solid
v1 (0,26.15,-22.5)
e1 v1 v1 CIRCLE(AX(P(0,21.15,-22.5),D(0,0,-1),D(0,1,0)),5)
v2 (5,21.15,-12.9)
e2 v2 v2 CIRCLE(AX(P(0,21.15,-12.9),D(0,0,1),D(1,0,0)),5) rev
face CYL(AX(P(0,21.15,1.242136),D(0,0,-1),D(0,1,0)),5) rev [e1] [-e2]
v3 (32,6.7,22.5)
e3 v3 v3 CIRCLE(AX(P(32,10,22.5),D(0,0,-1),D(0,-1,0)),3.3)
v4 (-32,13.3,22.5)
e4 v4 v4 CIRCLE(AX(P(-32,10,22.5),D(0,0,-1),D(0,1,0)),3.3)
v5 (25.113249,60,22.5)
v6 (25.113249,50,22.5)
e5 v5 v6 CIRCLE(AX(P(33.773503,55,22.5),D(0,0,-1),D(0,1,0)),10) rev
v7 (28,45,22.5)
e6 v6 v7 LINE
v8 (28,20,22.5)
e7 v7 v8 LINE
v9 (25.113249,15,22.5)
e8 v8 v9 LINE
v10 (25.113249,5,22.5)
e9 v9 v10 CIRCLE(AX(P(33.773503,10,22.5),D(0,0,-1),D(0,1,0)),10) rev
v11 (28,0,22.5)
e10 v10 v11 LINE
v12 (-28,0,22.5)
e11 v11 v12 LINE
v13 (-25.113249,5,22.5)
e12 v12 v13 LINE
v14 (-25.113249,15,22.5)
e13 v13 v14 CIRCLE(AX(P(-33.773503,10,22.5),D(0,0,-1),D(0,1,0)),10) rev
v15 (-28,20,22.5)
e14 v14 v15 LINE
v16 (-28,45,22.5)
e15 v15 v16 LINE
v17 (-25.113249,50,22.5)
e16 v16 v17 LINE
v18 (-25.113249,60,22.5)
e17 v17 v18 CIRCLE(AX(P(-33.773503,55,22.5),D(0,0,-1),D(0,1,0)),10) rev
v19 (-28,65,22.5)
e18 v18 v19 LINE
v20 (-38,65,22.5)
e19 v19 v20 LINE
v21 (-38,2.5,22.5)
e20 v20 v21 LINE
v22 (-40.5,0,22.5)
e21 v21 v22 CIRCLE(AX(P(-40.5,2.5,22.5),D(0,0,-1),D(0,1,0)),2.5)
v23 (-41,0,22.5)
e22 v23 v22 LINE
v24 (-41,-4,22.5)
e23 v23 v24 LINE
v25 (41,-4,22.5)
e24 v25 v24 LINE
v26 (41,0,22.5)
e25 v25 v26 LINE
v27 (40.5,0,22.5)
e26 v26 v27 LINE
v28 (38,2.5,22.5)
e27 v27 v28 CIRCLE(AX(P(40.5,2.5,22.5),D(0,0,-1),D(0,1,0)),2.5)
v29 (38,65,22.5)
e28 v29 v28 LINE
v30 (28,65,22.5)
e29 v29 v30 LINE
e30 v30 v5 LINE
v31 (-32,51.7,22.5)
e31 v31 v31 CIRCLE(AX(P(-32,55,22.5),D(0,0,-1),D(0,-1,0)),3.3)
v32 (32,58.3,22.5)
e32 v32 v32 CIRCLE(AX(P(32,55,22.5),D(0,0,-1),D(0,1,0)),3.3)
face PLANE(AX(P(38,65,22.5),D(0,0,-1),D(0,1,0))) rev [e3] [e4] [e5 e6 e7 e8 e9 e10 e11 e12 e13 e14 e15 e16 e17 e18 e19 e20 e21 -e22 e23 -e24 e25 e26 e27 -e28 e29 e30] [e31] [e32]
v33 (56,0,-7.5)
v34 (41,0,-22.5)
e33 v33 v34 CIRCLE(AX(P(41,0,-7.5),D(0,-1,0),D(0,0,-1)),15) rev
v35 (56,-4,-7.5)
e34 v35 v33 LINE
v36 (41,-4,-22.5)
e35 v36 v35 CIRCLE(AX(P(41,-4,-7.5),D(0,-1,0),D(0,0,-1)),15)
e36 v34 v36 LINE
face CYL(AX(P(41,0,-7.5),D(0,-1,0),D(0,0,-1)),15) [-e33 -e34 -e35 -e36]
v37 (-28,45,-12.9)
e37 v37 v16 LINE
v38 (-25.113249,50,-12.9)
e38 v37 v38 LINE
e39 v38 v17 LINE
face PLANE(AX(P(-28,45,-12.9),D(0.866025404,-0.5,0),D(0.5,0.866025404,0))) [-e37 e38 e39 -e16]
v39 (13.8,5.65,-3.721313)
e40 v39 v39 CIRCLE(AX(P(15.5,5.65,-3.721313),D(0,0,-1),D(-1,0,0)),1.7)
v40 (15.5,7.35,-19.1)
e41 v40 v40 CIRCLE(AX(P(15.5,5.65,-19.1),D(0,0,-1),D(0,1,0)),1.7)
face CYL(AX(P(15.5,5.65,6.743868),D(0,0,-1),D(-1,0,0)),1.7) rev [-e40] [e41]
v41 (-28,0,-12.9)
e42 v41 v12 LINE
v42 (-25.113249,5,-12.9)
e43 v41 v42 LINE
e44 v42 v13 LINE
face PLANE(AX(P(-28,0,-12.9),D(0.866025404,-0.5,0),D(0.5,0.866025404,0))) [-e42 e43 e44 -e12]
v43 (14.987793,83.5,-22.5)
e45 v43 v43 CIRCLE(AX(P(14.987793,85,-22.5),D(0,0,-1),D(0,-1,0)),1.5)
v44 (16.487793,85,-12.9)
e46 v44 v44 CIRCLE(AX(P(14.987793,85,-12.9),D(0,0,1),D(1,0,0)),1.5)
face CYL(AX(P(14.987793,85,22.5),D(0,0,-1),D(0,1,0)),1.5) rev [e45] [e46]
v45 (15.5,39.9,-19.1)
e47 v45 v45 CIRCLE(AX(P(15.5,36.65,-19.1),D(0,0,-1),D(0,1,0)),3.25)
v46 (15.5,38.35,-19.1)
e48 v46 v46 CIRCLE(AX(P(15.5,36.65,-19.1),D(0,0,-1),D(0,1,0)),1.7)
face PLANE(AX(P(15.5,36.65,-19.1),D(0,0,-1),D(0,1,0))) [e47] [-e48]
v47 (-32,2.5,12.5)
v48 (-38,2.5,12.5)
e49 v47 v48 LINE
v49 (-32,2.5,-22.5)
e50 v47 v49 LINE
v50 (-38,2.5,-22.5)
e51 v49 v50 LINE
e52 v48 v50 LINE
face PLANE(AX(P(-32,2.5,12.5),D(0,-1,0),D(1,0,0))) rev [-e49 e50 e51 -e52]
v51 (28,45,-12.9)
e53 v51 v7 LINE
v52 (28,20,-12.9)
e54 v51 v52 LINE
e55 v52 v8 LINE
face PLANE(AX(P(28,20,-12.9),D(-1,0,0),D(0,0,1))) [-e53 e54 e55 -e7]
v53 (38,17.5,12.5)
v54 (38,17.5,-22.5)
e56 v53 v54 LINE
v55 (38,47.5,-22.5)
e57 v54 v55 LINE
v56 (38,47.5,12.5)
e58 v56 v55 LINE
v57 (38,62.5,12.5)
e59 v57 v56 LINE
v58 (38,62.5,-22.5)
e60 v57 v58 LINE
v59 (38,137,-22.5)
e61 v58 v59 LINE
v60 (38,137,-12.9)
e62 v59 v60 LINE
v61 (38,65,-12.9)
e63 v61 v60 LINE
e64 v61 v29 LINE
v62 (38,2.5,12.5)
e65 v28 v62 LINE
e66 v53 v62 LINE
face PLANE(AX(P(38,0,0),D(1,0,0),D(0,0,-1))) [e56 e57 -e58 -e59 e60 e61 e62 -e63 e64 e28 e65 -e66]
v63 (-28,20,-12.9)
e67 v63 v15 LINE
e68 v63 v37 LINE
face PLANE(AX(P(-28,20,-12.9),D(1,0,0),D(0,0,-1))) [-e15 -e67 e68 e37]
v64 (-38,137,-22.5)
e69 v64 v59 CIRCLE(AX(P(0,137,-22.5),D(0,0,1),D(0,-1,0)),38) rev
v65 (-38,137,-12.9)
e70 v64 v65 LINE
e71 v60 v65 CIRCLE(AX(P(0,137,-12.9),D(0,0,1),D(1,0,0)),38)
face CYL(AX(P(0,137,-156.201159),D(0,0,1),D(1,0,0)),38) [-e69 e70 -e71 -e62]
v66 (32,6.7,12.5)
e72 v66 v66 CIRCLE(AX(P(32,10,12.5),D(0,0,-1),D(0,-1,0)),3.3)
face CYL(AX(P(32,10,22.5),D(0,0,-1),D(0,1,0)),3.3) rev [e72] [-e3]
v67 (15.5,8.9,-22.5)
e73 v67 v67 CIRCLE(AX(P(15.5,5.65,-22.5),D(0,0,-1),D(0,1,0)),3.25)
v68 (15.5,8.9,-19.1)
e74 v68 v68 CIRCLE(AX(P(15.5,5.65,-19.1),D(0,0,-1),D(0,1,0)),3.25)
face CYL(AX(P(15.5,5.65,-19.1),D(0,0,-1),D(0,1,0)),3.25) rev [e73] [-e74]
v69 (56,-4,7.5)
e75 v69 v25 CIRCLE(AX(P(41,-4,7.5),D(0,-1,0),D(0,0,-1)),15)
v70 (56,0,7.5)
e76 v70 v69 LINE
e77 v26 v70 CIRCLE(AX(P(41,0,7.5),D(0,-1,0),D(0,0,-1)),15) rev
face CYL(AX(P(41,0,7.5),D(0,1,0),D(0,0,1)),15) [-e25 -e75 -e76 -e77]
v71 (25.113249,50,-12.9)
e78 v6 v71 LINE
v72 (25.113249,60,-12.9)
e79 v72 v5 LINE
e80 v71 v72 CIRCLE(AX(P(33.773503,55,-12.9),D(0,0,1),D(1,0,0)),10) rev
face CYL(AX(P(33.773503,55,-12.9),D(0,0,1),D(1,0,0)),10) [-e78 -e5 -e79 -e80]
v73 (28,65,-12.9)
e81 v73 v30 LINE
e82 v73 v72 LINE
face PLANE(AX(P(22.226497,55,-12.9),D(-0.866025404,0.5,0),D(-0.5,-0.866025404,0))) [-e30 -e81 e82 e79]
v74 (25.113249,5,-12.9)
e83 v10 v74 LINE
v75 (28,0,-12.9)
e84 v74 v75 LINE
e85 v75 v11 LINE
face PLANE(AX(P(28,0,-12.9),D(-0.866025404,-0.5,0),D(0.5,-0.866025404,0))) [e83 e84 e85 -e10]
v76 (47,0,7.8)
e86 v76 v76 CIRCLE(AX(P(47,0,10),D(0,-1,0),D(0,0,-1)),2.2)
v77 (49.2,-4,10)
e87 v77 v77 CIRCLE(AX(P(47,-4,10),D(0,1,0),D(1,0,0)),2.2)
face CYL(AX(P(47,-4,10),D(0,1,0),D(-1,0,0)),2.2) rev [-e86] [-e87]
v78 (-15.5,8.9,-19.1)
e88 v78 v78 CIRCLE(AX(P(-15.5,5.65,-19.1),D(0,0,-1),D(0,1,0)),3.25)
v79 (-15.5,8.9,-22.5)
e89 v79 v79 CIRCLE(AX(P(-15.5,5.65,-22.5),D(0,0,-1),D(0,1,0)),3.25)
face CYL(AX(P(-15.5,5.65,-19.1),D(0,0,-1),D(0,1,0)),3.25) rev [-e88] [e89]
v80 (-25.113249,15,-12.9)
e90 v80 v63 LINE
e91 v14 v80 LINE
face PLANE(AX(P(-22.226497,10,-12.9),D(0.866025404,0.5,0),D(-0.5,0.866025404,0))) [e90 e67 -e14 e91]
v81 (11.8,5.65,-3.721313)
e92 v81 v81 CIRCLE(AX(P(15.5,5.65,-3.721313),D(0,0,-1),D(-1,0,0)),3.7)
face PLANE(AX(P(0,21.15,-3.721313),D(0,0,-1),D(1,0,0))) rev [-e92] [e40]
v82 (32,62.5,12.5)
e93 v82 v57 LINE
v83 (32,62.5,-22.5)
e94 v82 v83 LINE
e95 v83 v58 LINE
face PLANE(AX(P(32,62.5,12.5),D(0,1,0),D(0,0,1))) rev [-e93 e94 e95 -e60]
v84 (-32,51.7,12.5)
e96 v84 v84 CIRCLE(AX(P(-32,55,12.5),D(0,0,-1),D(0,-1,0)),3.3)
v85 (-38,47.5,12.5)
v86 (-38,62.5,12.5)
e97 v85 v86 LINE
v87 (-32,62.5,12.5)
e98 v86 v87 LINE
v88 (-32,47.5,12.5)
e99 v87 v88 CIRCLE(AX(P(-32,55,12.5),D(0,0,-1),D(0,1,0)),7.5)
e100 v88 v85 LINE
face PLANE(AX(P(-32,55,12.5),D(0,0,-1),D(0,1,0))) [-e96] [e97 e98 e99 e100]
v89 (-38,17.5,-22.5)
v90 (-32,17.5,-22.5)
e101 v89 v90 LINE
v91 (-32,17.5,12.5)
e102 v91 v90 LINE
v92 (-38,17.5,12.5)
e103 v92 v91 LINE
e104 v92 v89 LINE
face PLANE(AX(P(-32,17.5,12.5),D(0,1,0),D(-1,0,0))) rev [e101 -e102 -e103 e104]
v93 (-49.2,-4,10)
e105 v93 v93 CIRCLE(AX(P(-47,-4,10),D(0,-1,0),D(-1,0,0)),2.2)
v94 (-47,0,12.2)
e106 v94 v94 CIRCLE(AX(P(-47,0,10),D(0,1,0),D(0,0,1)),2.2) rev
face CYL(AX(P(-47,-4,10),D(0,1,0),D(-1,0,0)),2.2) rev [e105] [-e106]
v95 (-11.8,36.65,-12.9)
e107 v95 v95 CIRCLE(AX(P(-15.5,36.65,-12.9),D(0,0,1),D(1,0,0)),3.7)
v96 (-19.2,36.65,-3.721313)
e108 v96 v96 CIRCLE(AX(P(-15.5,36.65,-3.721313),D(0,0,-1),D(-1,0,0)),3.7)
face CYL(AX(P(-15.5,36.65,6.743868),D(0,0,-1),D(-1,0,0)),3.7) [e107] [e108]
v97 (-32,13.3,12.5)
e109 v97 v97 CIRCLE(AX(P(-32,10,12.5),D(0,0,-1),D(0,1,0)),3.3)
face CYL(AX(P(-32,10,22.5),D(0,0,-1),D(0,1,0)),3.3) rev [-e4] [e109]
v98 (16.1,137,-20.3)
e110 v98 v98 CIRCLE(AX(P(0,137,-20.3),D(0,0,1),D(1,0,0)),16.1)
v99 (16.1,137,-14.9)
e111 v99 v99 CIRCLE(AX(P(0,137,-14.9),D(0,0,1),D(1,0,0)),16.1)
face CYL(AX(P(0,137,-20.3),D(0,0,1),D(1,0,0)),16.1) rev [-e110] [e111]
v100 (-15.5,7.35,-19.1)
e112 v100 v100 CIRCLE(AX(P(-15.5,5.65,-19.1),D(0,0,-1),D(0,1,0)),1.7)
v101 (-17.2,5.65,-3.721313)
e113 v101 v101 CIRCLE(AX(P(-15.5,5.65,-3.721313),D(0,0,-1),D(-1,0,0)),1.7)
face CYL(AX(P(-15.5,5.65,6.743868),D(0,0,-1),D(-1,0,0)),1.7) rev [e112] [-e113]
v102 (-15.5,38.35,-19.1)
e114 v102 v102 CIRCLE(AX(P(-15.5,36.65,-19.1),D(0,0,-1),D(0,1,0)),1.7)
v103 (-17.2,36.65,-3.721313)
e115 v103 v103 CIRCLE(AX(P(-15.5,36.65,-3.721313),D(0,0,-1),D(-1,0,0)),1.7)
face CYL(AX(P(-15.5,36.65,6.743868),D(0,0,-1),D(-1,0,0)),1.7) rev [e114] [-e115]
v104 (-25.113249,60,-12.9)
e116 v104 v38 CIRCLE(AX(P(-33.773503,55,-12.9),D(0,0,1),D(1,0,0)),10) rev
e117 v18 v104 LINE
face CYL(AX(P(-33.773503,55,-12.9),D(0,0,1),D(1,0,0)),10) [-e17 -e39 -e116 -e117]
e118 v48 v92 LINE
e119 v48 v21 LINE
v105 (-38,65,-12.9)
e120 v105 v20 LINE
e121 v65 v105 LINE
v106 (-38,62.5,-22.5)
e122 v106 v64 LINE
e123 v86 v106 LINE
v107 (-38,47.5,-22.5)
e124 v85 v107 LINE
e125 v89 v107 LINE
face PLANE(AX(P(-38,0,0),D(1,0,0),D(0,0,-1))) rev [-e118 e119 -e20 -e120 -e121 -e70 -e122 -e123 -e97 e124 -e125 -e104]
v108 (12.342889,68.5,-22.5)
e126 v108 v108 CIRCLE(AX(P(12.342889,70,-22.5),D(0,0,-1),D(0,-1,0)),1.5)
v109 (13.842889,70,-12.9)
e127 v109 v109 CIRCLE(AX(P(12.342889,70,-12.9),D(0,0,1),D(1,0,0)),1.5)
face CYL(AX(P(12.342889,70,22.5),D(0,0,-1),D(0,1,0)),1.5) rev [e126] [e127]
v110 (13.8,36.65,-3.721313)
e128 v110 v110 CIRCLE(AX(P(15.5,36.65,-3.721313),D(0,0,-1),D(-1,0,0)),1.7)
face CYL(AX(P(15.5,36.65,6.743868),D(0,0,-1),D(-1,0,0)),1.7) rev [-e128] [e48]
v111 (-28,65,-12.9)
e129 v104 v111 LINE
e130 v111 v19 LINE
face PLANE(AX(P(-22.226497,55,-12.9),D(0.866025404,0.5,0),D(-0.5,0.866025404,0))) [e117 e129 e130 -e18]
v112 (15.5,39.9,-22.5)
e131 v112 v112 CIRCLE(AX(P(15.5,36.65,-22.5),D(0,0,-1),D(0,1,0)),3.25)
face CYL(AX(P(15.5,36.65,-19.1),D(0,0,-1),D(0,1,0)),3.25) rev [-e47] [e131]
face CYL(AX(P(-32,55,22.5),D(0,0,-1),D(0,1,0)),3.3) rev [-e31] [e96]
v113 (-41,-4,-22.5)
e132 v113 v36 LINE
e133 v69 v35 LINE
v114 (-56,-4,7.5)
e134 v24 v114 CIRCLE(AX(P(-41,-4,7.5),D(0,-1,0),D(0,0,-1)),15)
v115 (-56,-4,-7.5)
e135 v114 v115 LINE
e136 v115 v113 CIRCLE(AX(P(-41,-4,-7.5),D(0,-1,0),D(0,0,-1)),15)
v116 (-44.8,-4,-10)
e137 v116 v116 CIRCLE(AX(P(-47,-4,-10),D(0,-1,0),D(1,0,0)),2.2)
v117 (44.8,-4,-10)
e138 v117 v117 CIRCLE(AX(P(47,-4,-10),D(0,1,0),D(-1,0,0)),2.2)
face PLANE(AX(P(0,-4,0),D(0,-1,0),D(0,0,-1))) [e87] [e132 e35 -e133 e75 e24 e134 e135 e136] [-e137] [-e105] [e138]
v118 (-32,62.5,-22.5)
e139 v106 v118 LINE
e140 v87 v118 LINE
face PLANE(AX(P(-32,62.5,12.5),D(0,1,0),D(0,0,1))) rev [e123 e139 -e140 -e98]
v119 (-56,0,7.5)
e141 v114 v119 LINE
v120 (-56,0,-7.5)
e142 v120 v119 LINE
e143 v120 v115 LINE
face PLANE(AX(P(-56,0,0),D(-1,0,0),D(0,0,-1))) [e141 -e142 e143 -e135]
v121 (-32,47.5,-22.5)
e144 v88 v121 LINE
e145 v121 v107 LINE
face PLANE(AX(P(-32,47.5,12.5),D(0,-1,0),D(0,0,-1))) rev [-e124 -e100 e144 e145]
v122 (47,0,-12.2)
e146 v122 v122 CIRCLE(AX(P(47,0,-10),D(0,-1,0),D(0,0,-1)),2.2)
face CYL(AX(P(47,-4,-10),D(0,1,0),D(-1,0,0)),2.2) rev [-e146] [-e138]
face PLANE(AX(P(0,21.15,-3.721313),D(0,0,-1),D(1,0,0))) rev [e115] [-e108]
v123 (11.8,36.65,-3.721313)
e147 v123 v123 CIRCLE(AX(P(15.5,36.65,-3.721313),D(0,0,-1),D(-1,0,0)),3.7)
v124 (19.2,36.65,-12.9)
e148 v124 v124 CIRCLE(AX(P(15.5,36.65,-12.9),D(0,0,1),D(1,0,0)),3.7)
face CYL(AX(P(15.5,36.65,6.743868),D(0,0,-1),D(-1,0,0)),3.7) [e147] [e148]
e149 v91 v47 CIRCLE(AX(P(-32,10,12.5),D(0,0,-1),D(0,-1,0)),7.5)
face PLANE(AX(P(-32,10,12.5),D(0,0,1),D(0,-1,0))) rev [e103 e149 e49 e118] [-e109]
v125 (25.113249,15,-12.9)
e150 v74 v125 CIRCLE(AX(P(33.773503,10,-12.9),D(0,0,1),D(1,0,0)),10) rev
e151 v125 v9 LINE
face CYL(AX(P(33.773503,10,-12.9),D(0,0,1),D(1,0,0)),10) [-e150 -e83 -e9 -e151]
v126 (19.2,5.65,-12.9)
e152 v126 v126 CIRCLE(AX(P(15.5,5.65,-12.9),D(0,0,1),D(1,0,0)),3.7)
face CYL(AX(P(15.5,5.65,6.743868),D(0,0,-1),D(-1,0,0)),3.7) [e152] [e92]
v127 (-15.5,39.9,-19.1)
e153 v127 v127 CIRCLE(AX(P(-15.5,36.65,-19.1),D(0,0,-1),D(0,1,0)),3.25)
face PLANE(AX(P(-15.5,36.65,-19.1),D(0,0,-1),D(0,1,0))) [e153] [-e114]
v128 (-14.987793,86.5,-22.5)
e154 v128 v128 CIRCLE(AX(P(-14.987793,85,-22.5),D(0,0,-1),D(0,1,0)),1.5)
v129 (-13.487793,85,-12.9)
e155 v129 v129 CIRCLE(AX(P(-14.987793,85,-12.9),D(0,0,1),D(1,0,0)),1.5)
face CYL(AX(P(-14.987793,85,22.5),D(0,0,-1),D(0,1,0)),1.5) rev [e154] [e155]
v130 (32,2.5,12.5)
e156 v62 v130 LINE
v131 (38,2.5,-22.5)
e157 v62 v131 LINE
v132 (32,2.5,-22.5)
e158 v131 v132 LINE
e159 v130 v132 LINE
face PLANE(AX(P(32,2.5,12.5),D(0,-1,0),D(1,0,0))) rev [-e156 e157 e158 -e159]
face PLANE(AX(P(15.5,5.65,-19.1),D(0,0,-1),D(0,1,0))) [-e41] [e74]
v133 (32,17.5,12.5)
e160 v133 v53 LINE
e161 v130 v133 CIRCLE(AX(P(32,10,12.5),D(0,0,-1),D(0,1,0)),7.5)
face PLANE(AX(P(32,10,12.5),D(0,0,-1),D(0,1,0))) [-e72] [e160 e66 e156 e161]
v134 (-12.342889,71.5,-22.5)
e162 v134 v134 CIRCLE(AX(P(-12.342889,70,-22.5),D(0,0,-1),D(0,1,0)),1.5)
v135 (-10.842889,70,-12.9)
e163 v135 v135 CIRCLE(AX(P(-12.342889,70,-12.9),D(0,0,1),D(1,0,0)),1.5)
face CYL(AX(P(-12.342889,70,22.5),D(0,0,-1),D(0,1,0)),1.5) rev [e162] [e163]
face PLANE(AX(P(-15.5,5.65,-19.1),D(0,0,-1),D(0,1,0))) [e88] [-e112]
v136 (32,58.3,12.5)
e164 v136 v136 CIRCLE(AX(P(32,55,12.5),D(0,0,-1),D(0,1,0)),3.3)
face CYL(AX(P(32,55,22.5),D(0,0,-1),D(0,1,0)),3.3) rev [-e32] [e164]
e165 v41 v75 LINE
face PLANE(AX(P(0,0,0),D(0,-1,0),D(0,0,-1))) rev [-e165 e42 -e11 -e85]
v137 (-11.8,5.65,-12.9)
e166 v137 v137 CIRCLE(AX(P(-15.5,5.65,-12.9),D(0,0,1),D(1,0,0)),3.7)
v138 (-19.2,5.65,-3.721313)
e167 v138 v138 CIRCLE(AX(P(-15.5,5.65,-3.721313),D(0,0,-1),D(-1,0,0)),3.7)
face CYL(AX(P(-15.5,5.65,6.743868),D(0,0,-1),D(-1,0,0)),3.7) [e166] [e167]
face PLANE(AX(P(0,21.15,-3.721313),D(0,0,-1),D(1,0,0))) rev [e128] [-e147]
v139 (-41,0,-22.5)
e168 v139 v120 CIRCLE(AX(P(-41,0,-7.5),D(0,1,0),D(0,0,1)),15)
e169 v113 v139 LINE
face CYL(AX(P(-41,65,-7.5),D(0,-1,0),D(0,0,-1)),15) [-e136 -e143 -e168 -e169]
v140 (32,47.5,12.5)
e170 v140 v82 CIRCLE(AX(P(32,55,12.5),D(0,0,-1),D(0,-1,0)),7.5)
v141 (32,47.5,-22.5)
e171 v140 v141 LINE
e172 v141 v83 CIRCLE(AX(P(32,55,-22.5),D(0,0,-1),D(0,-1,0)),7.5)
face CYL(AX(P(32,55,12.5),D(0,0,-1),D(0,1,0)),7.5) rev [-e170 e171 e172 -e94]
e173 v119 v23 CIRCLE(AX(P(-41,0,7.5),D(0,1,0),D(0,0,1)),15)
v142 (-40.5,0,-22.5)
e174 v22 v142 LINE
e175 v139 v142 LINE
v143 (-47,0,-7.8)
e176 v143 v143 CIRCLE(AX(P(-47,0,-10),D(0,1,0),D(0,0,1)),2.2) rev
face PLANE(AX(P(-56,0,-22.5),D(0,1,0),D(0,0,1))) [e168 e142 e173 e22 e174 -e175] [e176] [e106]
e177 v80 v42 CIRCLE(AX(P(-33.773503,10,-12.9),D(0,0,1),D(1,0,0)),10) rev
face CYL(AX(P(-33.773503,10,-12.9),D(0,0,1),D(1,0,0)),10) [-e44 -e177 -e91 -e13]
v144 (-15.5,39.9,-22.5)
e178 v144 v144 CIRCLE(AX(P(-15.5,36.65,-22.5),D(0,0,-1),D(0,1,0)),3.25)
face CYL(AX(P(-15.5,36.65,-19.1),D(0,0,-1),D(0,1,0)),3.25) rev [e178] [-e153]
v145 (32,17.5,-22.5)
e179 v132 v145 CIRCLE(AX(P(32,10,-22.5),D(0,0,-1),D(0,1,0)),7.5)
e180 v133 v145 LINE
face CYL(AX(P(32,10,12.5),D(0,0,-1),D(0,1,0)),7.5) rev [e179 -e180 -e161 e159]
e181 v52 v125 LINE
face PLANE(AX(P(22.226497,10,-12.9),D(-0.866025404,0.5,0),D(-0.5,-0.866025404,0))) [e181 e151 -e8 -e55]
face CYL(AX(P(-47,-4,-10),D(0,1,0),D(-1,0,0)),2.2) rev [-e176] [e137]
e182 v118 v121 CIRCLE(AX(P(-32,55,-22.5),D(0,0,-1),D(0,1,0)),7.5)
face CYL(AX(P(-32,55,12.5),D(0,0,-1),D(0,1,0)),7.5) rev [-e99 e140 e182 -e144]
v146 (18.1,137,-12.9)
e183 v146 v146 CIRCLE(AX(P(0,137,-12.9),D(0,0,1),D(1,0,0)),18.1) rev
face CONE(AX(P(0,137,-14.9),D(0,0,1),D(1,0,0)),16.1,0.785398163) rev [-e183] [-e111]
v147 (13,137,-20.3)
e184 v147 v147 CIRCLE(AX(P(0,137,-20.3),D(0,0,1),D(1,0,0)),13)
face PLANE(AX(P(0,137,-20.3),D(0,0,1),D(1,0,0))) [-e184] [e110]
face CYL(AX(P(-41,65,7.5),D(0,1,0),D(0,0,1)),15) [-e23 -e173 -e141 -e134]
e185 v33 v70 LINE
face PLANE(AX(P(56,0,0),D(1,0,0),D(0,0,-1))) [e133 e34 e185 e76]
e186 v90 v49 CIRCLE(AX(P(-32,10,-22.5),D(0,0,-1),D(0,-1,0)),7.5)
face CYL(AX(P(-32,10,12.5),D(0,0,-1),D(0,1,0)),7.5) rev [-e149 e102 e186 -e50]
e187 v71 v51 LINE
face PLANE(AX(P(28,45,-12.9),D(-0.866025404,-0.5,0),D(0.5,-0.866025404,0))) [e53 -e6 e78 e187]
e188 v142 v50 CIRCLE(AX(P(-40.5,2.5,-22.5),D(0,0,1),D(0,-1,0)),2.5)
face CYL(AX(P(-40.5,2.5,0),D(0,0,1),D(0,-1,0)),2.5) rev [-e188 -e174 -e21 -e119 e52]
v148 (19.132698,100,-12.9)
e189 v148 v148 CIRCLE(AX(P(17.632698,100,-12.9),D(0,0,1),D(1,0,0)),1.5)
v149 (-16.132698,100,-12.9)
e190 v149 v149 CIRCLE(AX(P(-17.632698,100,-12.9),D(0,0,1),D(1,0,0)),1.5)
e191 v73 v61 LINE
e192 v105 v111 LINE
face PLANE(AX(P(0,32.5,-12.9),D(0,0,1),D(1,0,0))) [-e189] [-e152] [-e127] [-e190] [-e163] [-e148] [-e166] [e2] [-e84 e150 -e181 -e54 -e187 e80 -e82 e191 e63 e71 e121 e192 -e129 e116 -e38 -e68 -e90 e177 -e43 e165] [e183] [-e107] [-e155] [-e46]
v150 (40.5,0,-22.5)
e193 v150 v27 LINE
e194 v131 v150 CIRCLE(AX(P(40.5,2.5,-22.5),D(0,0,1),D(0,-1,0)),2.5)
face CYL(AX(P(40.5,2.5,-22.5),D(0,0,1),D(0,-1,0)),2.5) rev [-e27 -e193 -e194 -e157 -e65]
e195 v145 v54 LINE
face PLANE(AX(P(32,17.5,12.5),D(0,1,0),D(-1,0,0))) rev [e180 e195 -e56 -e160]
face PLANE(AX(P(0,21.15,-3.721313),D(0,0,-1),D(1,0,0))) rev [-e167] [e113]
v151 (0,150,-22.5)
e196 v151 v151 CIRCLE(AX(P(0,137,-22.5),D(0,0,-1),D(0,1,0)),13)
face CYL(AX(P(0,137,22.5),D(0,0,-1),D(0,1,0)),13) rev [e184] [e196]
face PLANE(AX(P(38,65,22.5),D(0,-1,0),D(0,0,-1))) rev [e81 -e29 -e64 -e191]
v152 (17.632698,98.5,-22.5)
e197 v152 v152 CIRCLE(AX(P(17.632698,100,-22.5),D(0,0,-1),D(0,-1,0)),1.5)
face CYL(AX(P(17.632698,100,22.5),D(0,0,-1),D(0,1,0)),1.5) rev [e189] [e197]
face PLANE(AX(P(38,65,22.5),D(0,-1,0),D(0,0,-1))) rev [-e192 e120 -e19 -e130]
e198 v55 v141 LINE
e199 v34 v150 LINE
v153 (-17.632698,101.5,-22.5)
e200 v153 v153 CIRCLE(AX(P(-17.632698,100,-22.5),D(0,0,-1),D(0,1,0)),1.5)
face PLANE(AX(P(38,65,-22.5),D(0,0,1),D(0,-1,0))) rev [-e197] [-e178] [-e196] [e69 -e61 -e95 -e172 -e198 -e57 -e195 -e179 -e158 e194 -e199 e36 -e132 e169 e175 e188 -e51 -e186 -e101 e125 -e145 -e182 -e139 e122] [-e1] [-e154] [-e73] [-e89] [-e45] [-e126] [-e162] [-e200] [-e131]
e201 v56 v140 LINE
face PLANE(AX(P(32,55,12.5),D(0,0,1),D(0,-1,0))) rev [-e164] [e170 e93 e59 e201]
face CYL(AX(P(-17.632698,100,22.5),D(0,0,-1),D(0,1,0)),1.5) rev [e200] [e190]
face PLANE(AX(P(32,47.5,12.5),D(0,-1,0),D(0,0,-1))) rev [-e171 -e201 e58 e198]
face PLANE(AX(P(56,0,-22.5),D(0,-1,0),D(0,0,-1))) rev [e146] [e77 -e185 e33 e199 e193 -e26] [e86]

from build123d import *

# Parameters (mm, degrees)
SKIZZE1_W                        = 45
SKIZZE1_H                        = 65
AUFSATZ_LINEAR_AUSTRAGEN1_DEPTH  = 38
SKIZZE2_OUTSIDE_W                = 99.932
SKIZZE2_OUTSIDE_H                = 88.932
SCHNITT_LINEAR_AUSTRAGEN1_DEPTH  = 35.4
SCHNITT_LINEAR_AUSTRAGEN2_DEPTH  = 35
SKIZZE4_R                        = 3.3
SCHNITT_LINEAR_AUSTRAGEN3_DEPTH  = 84.030115019
AUFSATZ_LINEAR_AUSTRAGEN2_DEPTH  = 9.6
SKIZZE6_R                        = 16.1
SCHNITT_LINEAR_AUSTRAGEN4_DEPTH  = 7.4
SKIZZE8_R                        = 13
SCHNITT_LINEAR_AUSTRAGEN5_DEPTH  = 185.645606501
SKIZZE9_R                        = 1.5
SCHNITT_LINEAR_AUSTRAGEN6_DEPTH  = 185.645606501
SKIZZE12_W                       = 76
SKIZZE12_H                       = 45
AUFSATZ_LINEAR_AUSTRAGEN4_DEPTH  = 4
SKIZZE10_W                       = 45
SKIZZE10_H                       = 4
AUFSATZ_LINEAR_AUSTRAGEN3_DEPTH  = 18
VERRUNDUNG1_R                    = 15
SKIZZE11_R                       = 2.2
SCHNITT_LINEAR_AUSTRAGEN7_DEPTH  = 183.752564961
VERRUNDUNG1_OF_SPIEGELN1_R       = 15
SKIZZE13_R                       = 3.7
SKIZZE13_R_2                     = 1.7
AUFSATZ_LINEAR_AUSTRAGEN5_DEPTH  = 9.178687268
SCHNITT_LINEAR_START             = -9.6
SKIZZE14_R                       = 1.7
SCHNITT_LINEAR_AUSTRAGEN8_DEPTH  = 9.6
SKIZZE15_R                       = 5
SCHNITT_LINEAR_AUSTRAGEN9_DEPTH  = 9.6
SKIZZE19_R                       = 3.25
SCHNITT_LINEAR_AUSTRAGEN11_DEPTH = 3.4
VERRUNDUNG2_R                    = 10
FASE2_SIZE                       = 2
VERRUNDUNG3_R                    = 2.5


with BuildPart() as part:
    # Skizze1 → Aufsatz-Linear austragen1 (new, symmetric)
    with BuildSketch(Plane(origin=(0, 0, 0), x_dir=(0, 0, -1), z_dir=(1, 0, 0))):
        with Locations((0, 32.5)):
            Rectangle(SKIZZE1_W, SKIZZE1_H)
    extrude(amount=AUFSATZ_LINEAR_AUSTRAGEN1_DEPTH, both=True)

    # Skizze2 outside → Schnitt-Linear austragen1 (cut)
    with BuildSketch(Plane.XY.offset(22.5)):
        with Locations((0, 32.5)):
            Rectangle(SKIZZE2_OUTSIDE_W, SKIZZE2_OUTSIDE_H)
        Polygon((-38, 0), (-28, 0), (-22.226497308, 10), (-28, 20), (-28, 45), (-22.226497308, 55), (-28, 65), (-38, 65), align=None, mode=Mode.SUBTRACT)
        Polygon((38, 65), (38, 0), (28, 0), (22.226497308, 10), (28, 20), (28, 45), (22.226497308, 55), (28, 65), align=None, mode=Mode.SUBTRACT)
    extrude(amount=-SCHNITT_LINEAR_AUSTRAGEN1_DEPTH, mode=Mode.SUBTRACT)

    # Skizze3 → Schnitt-Linear austragen2 (cut)
    with BuildSketch(Plane(origin=(0, 0, -22.5), x_dir=(-1, 0, 0), z_dir=(0, 0, -1))):
        with BuildLine():
            Line((-32, 17.5), (-38, 17.5))
            Line((-38, 17.5), (-38, 2.5))
            Line((-38, 2.5), (-32, 2.5))
            ThreePointArc((-32, 2.5), (-24.5, 10), (-32, 17.5))
        make_face()
        with BuildLine():
            Line((38, 17.5), (38, 2.5))
            Line((38, 2.5), (32, 2.5))
            ThreePointArc((32, 2.5), (24.5, 10), (32, 17.5))
            Line((32, 17.5), (38, 17.5))
        make_face()
        with BuildLine():
            Line((32, 47.5), (38, 47.5))
            Line((38, 47.5), (38, 62.5))
            Line((38, 62.5), (32, 62.5))
            ThreePointArc((32, 62.5), (24.5, 55), (32, 47.5))
        make_face()
        with BuildLine():
            Line((-38, 47.5), (-38, 62.5))
            Line((-38, 62.5), (-32, 62.5))
            ThreePointArc((-32, 62.5), (-24.5, 55), (-32, 47.5))
            Line((-32, 47.5), (-38, 47.5))
        make_face()
    extrude(amount=-SCHNITT_LINEAR_AUSTRAGEN2_DEPTH, mode=Mode.SUBTRACT)

    # Skizze4 → Schnitt-Linear austragen3 (cut, through all)
    with BuildSketch(Plane(origin=(0, 0, 12.5), x_dir=(-1, 0, 0), z_dir=(0, 0, -1))):
        with Locations(Location((32, 10, 0), (0, 0, 90))):
            Circle(SKIZZE4_R)
        with Locations(Location((-32, 10, 0), (0, 0, 270))):
            Circle(SKIZZE4_R)
        with Locations(Location((-32, 55, 0), (0, 0, 90))):
            Circle(SKIZZE4_R)
        with Locations(Location((32, 55, 0), (0, 0, 270))):
            Circle(SKIZZE4_R)
    extrude(amount=-SCHNITT_LINEAR_AUSTRAGEN3_DEPTH, mode=Mode.SUBTRACT)

    # Skizze5 → Aufsatz-Linear austragen2 (add)
    with BuildSketch(Plane.XY.offset(-12.9)):
        with BuildLine():
            Line((-38, 65), (38, 65))
            Line((38, 65), (38, 137))
            ThreePointArc((38, 137), (0, 175), (-38, 137))
            Line((-38, 137), (-38, 65))
        make_face()
    extrude(amount=-AUFSATZ_LINEAR_AUSTRAGEN2_DEPTH)

    # Skizze6 → Schnitt-Linear austragen4 (cut)
    with BuildSketch(Plane.XY.offset(-12.9)):
        with Locations((0, 137)):
            Circle(SKIZZE6_R)
    extrude(amount=-SCHNITT_LINEAR_AUSTRAGEN4_DEPTH, mode=Mode.SUBTRACT)

    # Skizze8 → Schnitt-Linear austragen5 (cut, through all)
    with BuildSketch(Plane(origin=(0, 0, -22.5), x_dir=(-1, 0, 0), z_dir=(0, 0, -1))):
        with Locations(Location((0, 137, 0), (0, 0, 90))):
            Circle(SKIZZE8_R)
    extrude(amount=-SCHNITT_LINEAR_AUSTRAGEN5_DEPTH, mode=Mode.SUBTRACT)

    # Skizze9 → Schnitt-Linear austragen6 (cut, through all)
    with BuildSketch(Plane(origin=(0, 0, -22.5), x_dir=(-1, 0, 0), z_dir=(0, 0, -1))):
        with Locations(Location((12.34288865, 70, 0), (0, 0, 90))):
            Circle(SKIZZE9_R)
        with Locations(Location((14.98779336, 85, 0), (0, 0, 90))):
            Circle(SKIZZE9_R)
        with Locations(Location((17.632698071, 100, 0), (0, 0, 90))):
            Circle(SKIZZE9_R)
        with Locations(Location((-12.34288865, 70, 0), (0, 0, 180))):
            Circle(SKIZZE9_R)
        with Locations(Location((-17.632698071, 100, 0), (0, 0, 180))):
            Circle(SKIZZE9_R)
        with Locations(Location((-14.98779336, 85, 0), (0, 0, 180))):
            Circle(SKIZZE9_R)
    extrude(amount=-SCHNITT_LINEAR_AUSTRAGEN6_DEPTH, mode=Mode.SUBTRACT)

    # Skizze12 → Aufsatz-Linear austragen4 (add)
    with BuildSketch(Plane.XZ):
        Rectangle(SKIZZE12_W, SKIZZE12_H)
    extrude(amount=AUFSATZ_LINEAR_AUSTRAGEN4_DEPTH)

    # Skizze10 → Aufsatz-Linear austragen3 (add)
    with BuildSketch(Plane(origin=(38, 0, 0), x_dir=(0, 0, -1), z_dir=(1, 0, 0))):
        with Locations((0, -2)):
            Rectangle(SKIZZE10_W, SKIZZE10_H)
    aufsatz_linear_austragen3 = extrude(amount=AUFSATZ_LINEAR_AUSTRAGEN3_DEPTH)

    # Verrundung1
    verrundung1_edges = [part.edges().sort_by_distance(p)[0] for p in [
        (56, -2, -22.5),
        (56, -2, 22.5),
    ]]
    fillet(verrundung1_edges, radius=VERRUNDUNG1_R)

    # Skizze11 → Schnitt-Linear austragen7 (cut, through all)
    with BuildSketch(Plane(origin=(0, 2.5, 0), x_dir=(1, 0, 0), z_dir=(0, 1, 0))):
        with Locations(Location((47, 10, 0), (0, 0, 180))):
            Circle(SKIZZE11_R)
        with Locations(Location((47, -10, 0), (0, 0, 90))):
            Circle(SKIZZE11_R)
    schnitt_linear_austragen7 = extrude(amount=-SCHNITT_LINEAR_AUSTRAGEN7_DEPTH, mode=Mode.SUBTRACT)

    # Spiegeln1: Aufsatz-Linear austragen3, Schnitt-Linear austragen7 across plane
    add(aufsatz_linear_austragen3.mirror(Plane(origin=(0, 0, 0), x_dir=(0, 0, 1), z_dir=(1, 0, 0))))
    add(schnitt_linear_austragen7.mirror(Plane(origin=(0, 0, 0), x_dir=(0, 0, 1), z_dir=(1, 0, 0))), mode=Mode.SUBTRACT)

    # Verrundung1 of Spiegeln1
    verrundung1_of_spiegeln1_edges = [part.edges().sort_by_distance(p)[0] for p in [
        (-56, -2, -22.5),
        (-56, -2, 22.5),
    ]]
    fillet(verrundung1_of_spiegeln1_edges, radius=VERRUNDUNG1_OF_SPIEGELN1_R)

    # Skizze13 → Aufsatz-Linear austragen5 (add)
    # profile 1 of 4: a face of its own
    with BuildSketch(Plane.XY.offset(-12.9)):
        with Locations(Location((-15.5, 36.65, 0), (0, 0, 180))):
            Circle(SKIZZE13_R)
        with Locations(Location((-15.5, 36.65, 0), (0, 0, 180))):
            Circle(SKIZZE13_R_2, mode=Mode.SUBTRACT)
    # profile 2 of 4: a face of its own
    with BuildSketch(Plane.XY.offset(-12.9)):
        with Locations(Location((15.5, 36.65, 0), (0, 0, 180))):
            Circle(SKIZZE13_R)
        with Locations(Location((15.5, 36.65, 0), (0, 0, 180))):
            Circle(SKIZZE13_R_2, mode=Mode.SUBTRACT)
    # profile 3 of 4: a face of its own
    with BuildSketch(Plane.XY.offset(-12.9)):
        with Locations(Location((15.5, 5.65, 0), (0, 0, 180))):
            Circle(SKIZZE13_R)
        with Locations(Location((15.5, 5.65, 0), (0, 0, 180))):
            Circle(SKIZZE13_R_2, mode=Mode.SUBTRACT)
    # profile 4 of 4: a face of its own
    with BuildSketch(Plane.XY.offset(-12.9)):
        with Locations(Location((-15.5, 5.65, 0), (0, 0, 180))):
            Circle(SKIZZE13_R)
        with Locations(Location((-15.5, 5.65, 0), (0, 0, 180))):
            Circle(SKIZZE13_R_2, mode=Mode.SUBTRACT)
    extrude(amount=AUFSATZ_LINEAR_AUSTRAGEN5_DEPTH)

    # Skizze14 → Schnitt-Linear austragen8 (cut)
    with BuildSketch(Plane.XY.offset(-12.9).offset(SCHNITT_LINEAR_START)):
        with Locations(Location((-15.5, 5.65, 0), (0, 0, 180))):
            Circle(SKIZZE14_R)
        with Locations(Location((15.5, 5.65, 0), (0, 0, 180))):
            Circle(SKIZZE14_R)
        with Locations(Location((15.5, 36.65, 0), (0, 0, 180))):
            Circle(SKIZZE14_R)
        with Locations(Location((-15.5, 36.65, 0), (0, 0, 180))):
            Circle(SKIZZE14_R)
    extrude(amount=SCHNITT_LINEAR_AUSTRAGEN8_DEPTH, mode=Mode.SUBTRACT)

    # Skizze15 → Schnitt-Linear austragen9 (cut)
    with BuildSketch(Plane(origin=(0, 0, -22.5), x_dir=(-1, 0, 0), z_dir=(0, 0, -1))):
        with Locations(Location((0, 21.15, 0), (0, 0, 90))):
            Circle(SKIZZE15_R)
    extrude(amount=-SCHNITT_LINEAR_AUSTRAGEN9_DEPTH, mode=Mode.SUBTRACT)

    # Skizze19 → Schnitt-Linear austragen11 (cut)
    with BuildSketch(Plane(origin=(0, 0, -22.5), x_dir=(-1, 0, 0), z_dir=(0, 0, -1))):
        with Locations(Location((-15.5, 36.65, 0), (0, 0, 90))):
            Circle(SKIZZE19_R)
        with Locations(Location((15.5, 36.65, 0), (0, 0, 90))):
            Circle(SKIZZE19_R)
        with Locations(Location((15.5, 5.65, 0), (0, 0, 90))):
            Circle(SKIZZE19_R)
        with Locations(Location((-15.5, 5.65, 0), (0, 0, 90))):
            Circle(SKIZZE19_R)
    extrude(amount=-SCHNITT_LINEAR_AUSTRAGEN11_DEPTH, mode=Mode.SUBTRACT)

    # Verrundung2
    verrundung2_edges = [part.edges().sort_by_distance(p)[0] for p in [
        (-22.226497308, 55, 4.8),
        (-22.226497308, 10, 4.8),
        (22.226497308, 55, 4.8),
        (22.226497308, 10, 4.8),
    ]]
    fillet(verrundung2_edges, radius=VERRUNDUNG2_R)

    # Fase2
    fase2_edges = [part.edges().sort_by_distance(p)[0] for p in [
        (-16.1, 137, -12.9),
    ]]
    chamfer(fase2_edges, length=FASE2_SIZE)

    # Verrundung3
    verrundung3_edges = [part.edges().sort_by_distance(p)[0] for p in [
        (-38, 0, 0),
        (38, 0, 0),
    ]]
    fillet(verrundung3_edges, radius=VERRUNDUNG3_R - 0.0001)  # a hair under: the kernel refuses the full size


solid = part.part
